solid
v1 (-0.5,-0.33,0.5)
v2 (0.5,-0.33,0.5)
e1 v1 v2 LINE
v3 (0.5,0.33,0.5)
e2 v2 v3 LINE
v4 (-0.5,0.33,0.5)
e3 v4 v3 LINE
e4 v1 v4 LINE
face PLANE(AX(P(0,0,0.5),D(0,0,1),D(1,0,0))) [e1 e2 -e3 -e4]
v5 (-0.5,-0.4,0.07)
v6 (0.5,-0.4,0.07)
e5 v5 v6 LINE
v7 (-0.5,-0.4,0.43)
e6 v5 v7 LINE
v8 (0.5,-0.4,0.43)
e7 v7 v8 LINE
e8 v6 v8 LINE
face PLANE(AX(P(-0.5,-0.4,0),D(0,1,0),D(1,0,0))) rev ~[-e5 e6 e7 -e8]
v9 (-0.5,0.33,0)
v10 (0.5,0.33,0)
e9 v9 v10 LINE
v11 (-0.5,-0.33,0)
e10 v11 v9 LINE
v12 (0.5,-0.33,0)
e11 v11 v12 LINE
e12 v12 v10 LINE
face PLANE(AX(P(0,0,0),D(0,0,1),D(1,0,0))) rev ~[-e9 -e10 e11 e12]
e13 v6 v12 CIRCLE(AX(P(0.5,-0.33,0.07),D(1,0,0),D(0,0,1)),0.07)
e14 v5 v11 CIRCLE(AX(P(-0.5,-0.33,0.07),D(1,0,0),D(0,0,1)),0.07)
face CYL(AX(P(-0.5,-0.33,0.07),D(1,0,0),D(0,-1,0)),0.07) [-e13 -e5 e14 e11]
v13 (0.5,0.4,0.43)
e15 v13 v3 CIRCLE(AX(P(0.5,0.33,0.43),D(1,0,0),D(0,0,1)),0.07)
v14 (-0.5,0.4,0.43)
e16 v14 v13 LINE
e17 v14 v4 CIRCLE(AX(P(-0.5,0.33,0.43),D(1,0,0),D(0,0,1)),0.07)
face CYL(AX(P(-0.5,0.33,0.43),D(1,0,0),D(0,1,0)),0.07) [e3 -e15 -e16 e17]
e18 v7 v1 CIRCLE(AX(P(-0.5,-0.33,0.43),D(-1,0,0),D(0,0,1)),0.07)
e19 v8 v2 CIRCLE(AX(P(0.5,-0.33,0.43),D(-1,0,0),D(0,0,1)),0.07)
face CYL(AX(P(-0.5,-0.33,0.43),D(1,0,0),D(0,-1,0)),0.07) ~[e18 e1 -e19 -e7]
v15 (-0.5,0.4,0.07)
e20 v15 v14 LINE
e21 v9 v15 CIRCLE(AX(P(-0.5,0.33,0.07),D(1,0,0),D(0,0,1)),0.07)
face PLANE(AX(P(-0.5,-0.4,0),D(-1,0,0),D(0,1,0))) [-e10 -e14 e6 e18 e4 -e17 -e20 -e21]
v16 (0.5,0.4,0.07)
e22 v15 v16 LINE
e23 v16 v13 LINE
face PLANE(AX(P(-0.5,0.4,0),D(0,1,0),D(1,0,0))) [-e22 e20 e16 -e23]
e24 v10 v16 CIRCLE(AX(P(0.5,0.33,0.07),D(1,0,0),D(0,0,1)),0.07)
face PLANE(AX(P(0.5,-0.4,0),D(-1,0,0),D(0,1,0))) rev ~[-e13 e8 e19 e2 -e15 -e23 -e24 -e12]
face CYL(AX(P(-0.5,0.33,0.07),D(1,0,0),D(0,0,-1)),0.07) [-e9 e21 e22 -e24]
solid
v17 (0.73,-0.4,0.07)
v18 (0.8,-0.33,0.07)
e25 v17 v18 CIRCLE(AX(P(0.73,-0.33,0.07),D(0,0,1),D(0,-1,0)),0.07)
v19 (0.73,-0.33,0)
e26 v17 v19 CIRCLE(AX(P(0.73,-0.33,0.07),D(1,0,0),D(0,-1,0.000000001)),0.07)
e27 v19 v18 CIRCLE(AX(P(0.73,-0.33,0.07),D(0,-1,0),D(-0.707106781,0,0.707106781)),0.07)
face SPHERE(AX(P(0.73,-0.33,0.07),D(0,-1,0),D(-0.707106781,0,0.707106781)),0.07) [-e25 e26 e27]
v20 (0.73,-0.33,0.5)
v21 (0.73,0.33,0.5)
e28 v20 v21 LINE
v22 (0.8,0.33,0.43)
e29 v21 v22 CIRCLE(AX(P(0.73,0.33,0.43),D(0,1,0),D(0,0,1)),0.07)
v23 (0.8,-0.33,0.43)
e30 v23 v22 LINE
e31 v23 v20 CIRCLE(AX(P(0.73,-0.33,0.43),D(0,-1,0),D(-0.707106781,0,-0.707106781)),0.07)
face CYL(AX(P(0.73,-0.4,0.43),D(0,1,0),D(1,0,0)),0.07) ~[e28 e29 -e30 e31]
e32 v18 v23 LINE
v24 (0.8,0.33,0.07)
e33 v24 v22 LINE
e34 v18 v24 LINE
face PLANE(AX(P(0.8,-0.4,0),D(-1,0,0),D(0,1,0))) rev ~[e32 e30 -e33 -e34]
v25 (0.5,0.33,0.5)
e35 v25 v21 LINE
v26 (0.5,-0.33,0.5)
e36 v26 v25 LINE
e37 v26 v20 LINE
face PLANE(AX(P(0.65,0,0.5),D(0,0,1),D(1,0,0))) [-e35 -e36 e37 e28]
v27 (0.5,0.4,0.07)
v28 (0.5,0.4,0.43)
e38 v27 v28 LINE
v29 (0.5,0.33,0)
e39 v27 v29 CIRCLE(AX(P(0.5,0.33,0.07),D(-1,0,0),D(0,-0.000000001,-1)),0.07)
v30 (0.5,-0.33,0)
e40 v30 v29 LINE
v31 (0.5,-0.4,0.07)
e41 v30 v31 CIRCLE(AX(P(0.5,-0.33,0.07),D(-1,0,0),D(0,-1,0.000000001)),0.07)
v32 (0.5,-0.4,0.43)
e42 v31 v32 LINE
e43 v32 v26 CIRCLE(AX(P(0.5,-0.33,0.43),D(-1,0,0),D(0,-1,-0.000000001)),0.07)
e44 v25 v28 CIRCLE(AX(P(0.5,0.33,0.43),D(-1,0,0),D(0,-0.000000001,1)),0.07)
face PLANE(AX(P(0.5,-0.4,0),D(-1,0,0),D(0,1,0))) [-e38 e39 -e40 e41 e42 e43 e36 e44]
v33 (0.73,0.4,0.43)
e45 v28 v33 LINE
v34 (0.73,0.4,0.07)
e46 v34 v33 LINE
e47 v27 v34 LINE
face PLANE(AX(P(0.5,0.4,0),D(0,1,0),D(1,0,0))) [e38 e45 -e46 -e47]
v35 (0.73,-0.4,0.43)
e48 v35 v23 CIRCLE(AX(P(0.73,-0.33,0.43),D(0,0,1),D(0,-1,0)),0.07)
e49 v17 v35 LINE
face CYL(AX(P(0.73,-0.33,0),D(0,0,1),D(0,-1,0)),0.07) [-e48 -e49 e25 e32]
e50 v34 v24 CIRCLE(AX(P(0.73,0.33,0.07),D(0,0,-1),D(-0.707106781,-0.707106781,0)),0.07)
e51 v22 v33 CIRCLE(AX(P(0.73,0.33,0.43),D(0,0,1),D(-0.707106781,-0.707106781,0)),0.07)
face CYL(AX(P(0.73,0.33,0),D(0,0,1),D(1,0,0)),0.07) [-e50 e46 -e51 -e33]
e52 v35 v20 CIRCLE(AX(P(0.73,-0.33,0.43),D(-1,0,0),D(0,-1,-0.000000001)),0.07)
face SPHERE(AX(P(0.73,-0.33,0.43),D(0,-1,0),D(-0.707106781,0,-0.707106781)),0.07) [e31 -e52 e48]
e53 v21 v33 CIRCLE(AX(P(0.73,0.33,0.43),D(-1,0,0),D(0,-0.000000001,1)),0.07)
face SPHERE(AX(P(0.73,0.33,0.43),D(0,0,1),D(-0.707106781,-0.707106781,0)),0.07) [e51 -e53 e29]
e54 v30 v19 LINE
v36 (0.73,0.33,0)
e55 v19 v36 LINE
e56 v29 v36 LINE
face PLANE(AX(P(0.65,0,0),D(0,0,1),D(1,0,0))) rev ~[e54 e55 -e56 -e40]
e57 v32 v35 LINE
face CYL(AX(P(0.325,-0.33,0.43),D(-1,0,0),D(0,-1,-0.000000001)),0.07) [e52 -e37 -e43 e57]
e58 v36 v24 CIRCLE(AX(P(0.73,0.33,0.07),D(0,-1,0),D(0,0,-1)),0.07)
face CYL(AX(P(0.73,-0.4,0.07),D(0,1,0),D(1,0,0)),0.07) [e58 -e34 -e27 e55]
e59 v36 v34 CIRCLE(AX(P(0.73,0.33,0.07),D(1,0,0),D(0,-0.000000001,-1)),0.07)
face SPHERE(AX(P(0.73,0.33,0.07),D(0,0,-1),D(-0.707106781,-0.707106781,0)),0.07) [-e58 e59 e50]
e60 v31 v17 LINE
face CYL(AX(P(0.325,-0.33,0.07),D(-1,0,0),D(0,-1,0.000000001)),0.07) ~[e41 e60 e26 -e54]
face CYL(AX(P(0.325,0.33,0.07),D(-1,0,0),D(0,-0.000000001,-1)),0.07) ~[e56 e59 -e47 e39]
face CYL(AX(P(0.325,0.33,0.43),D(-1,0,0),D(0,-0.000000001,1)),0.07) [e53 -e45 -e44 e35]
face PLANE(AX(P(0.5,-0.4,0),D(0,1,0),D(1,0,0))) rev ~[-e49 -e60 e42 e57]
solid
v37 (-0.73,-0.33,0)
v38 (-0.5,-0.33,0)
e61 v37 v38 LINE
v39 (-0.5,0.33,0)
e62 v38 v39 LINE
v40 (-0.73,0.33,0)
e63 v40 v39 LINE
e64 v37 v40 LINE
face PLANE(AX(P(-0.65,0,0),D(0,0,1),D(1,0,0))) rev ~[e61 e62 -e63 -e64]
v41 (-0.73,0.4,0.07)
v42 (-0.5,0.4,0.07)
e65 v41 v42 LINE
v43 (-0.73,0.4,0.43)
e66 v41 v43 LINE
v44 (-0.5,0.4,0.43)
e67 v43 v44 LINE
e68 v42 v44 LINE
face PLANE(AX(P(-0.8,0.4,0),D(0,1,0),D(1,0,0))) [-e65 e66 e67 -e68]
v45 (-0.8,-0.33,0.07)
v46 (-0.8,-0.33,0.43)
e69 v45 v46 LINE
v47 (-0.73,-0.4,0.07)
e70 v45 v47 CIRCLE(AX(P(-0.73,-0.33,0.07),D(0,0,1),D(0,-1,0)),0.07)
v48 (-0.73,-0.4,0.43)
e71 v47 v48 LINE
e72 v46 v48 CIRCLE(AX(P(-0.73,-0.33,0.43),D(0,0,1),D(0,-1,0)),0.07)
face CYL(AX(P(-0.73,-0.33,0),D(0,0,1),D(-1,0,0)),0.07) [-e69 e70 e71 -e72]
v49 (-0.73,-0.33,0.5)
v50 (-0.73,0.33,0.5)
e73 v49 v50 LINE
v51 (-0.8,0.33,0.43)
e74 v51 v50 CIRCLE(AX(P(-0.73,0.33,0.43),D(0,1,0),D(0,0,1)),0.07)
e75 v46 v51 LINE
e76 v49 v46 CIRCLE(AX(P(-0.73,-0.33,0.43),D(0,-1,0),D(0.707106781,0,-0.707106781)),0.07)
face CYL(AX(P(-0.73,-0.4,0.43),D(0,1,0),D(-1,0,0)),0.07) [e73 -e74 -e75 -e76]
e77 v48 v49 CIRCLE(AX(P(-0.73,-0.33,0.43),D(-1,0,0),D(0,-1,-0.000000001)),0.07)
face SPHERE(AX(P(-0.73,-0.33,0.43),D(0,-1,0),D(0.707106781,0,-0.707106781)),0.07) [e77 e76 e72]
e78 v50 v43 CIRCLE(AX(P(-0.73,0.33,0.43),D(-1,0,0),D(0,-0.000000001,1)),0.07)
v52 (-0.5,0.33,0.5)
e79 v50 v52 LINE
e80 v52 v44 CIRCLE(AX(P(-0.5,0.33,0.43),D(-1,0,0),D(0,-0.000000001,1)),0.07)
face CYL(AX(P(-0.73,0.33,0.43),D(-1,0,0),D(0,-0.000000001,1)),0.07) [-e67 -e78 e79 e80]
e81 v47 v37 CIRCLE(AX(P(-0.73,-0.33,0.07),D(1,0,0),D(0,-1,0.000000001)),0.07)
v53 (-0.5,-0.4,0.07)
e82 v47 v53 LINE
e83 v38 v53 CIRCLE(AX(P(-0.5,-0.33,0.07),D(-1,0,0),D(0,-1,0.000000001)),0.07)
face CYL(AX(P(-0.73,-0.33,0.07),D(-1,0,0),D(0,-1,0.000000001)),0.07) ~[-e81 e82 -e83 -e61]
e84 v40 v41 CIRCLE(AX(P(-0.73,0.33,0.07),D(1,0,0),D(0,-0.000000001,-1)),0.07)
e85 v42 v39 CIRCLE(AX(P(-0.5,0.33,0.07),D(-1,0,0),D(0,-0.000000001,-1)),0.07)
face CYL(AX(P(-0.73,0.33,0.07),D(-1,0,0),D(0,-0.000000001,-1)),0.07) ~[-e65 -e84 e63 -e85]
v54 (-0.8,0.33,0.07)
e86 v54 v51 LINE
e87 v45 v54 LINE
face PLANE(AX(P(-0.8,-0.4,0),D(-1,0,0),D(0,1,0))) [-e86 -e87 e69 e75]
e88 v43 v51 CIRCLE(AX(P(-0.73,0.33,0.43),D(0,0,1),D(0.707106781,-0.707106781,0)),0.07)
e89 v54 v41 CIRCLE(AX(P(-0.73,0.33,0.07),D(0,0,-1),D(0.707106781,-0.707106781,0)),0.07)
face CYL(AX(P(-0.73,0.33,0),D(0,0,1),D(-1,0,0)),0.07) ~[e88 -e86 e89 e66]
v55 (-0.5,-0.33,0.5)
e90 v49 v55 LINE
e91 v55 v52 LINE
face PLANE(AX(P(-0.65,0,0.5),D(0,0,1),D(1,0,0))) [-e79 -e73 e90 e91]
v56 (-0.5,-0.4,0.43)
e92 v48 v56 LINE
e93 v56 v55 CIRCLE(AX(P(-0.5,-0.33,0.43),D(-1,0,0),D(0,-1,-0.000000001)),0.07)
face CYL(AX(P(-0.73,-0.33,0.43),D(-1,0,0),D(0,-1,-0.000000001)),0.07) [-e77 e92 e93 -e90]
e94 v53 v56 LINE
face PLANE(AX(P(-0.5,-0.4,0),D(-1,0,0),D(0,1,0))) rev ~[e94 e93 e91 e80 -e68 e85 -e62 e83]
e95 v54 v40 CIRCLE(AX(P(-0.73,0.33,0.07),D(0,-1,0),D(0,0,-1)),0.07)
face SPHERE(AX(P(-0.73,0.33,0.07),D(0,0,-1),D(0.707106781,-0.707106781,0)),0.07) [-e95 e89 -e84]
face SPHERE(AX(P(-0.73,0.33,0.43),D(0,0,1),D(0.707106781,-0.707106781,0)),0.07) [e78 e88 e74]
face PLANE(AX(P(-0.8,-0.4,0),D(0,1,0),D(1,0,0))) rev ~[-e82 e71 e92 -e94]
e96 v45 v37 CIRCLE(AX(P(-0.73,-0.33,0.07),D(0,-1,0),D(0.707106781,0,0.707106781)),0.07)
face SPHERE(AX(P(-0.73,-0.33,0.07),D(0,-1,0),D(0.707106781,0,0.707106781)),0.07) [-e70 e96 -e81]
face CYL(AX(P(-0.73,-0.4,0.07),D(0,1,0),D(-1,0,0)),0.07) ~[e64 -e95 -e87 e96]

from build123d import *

# Parameters (mm, degrees)
F0_W           = 0.3
F0_H           = 0.8
F1_DEPTH       = 0.5
F0_W_2         = 1
F2_DEPTH       = 0.5
F3_R           = 0.07
F3_2_R         = 0.07
F4_T1_DEPTH    = 0.405
F4_S5_W        = 0.07
F4_S5_H        = 0.07
F4_T6_DEPTH    = 0.07
F4_S11_W       = 0.07
F4_S11_H       = 0.07
F4_T12_DEPTH   = 0.07
F4_S17_W       = 0.07
F4_S17_H       = 0.07
F4_T18_DEPTH   = 0.07
F4_S23_W       = 0.07
F4_S23_H       = 0.07
F4_T24_DEPTH   = 0.07
F4_2_F1_R      = 0.07
F4_2_F2_R      = 0.07
F4_2_F3_R      = 0.07
F4_2_F4_R      = 0.07
F4_3_T1_DEPTH  = 0.405
F4_3_S5_W      = 0.07
F4_3_S5_H      = 0.07
F4_3_T6_DEPTH  = 0.07
F4_3_S11_W     = 0.07
F4_3_S11_H     = 0.07
F4_3_T12_DEPTH = 0.07
F4_3_S17_W     = 0.07
F4_3_S17_H     = 0.07
F4_3_T18_DEPTH = 0.07
F4_3_S23_W     = 0.07
F4_3_S23_H     = 0.07
F4_3_T24_DEPTH = 0.07


# Not quite as in the source:
# - a fillet or chamfer that OpenCascade refuses, or shapes differently, is made with other operations: its cross-section is extruded or revolved along the edge and cut away or added


with BuildPart() as f1:
    # F0 (on Top) → F1 (new body)
    with BuildSketch(Plane.XY):
        with Locations((-0.65, 0)):
            Rectangle(F0_W, F0_H)
    extrude(amount=F1_DEPTH)

    # F3#2
    f3_2_edges = [f1.edges().sort_by_distance(p)[0] for p in [
        (-0.8, 0.4, 0.25),
        (-0.8, -0.4, 0.25),
        (-0.8, 0, 0),
        (-0.8, 0, 0.5),
    ]]
    fillet(f3_2_edges, radius=F3_2_R)

    # F4#3: fillet of radius 0.07 on 4 edges, made by hand

    # F4_3_s2 → F4_3_t1 (cut)
    with BuildSketch(Plane.YZ.offset(-0.73)):
        with BuildLine():
            ThreePointArc((0.33, 0.5), (0.3794974747, 0.4794974747), (0.4, 0.43))
            Line((0.4, 0.43), (0.4, 0.5))
            Line((0.4, 0.5), (0.33, 0.5))
        make_face()
        with BuildLine():
            ThreePointArc((0.33, 0), (0.3794974747, 0.0205025253), (0.4, 0.07))
            Line((0.4, 0.07), (0.4, 0))
            Line((0.4, 0), (0.33, 0))
        make_face()
        with BuildLine():
            ThreePointArc((-0.4, 0.43), (-0.3794974747, 0.4794974747), (-0.33, 0.5))
            Line((-0.33, 0.5), (-0.4, 0.5))
            Line((-0.4, 0.5), (-0.4, 0.43))
        make_face()
        with BuildLine():
            ThreePointArc((-0.4, 0.07), (-0.3794974747, 0.0205025253), (-0.33, 0))
            Line((-0.33, 0), (-0.4, 0))
            Line((-0.4, 0), (-0.4, 0.07))
        make_face()
    extrude(amount=F4_3_T1_DEPTH, mode=Mode.SUBTRACT)


with BuildPart() as f1b:
    # F0 (on Top) → F1, piece 2 (new body)
    with BuildSketch(Plane.XY):
        with Locations((0.65, 0)):
            Rectangle(F0_W, F0_H)
    extrude(amount=F1_DEPTH)

    # F3
    f3_edges = [f1b.edges().sort_by_distance(p)[0] for p in [
        (0.8, -0.4, 0.25),
        (0.8, 0.4, 0.25),
        (0.8, 0, 0),
        (0.8, 0, 0.5),
    ]]
    fillet(f3_edges, radius=F3_R)

    # F4: fillet of radius 0.07 on 4 edges, made by hand

    # F4_s2 → F4_t1 (cut)
    with BuildSketch(Plane.YZ.offset(0.325)):
        with BuildLine():
            ThreePointArc((0.33, 0.5), (0.3794974747, 0.4794974747), (0.4, 0.43))
            Line((0.4, 0.43), (0.4, 0.5))
            Line((0.4, 0.5), (0.33, 0.5))
        make_face()
        with BuildLine():
            ThreePointArc((0.33, 0), (0.3794974747, 0.0205025253), (0.4, 0.07))
            Line((0.4, 0.07), (0.4, 0))
            Line((0.4, 0), (0.33, 0))
        make_face()
        with BuildLine():
            ThreePointArc((-0.4, 0.43), (-0.3794974747, 0.4794974747), (-0.33, 0.5))
            Line((-0.33, 0.5), (-0.4, 0.5))
            Line((-0.4, 0.5), (-0.4, 0.43))
        make_face()
        with BuildLine():
            ThreePointArc((-0.4, 0.07), (-0.3794974747, 0.0205025253), (-0.33, 0))
            Line((-0.33, 0), (-0.4, 0))
            Line((-0.4, 0), (-0.4, 0.07))
        make_face()
    extrude(amount=F4_T1_DEPTH, mode=Mode.SUBTRACT)


with BuildPart() as f2:
    # F0 (on Top) → F2 (new body)
    with BuildSketch(Plane.XY):
        Rectangle(F0_W_2, F0_H)
    extrude(amount=F2_DEPTH)

    # F4#2: fillet of radius 0.07 on 4 edges, made by hand

    # F4_2_f1
    f4_2_f1_edges = [f2.edges().sort_by_distance(p)[0] for p in [
        (0, -0.4, 0),
    ]]
    fillet(f4_2_f1_edges, radius=F4_2_F1_R)

    # F4_2_f2
    f4_2_f2_edges = [f2.edges().sort_by_distance(p)[0] for p in [
        (0, -0.4, 0.5),
    ]]
    fillet(f4_2_f2_edges, radius=F4_2_F2_R)

    # F4_2_f3
    f4_2_f3_edges = [f2.edges().sort_by_distance(p)[0] for p in [
        (0, 0.4, 0),
    ]]
    fillet(f4_2_f3_edges, radius=F4_2_F3_R)

    # F4_2_f4
    f4_2_f4_edges = [f2.edges().sort_by_distance(p)[0] for p in [
        (0, 0.4, 0.5),
    ]]
    fillet(f4_2_f4_edges, radius=F4_2_F4_R)


with BuildPart() as f4_tool4:
    # F4_s5 → F4_t6 (new body)
    with BuildSketch(Plane.XZ.offset(0.33)):
        with Locations((0.765, 0.035)):
            Rectangle(F4_S5_W, F4_S5_H)
    extrude(amount=F4_T6_DEPTH)

    # F4_s7 → F4_t8 (revolve, cut)
    with BuildSketch(Plane(origin=(0.73, -0.33, 0.07), x_dir=(-0.7071067812, 0, 0.7071067812), z_dir=(0.7071067812, 0, 0.7071067812))):
        with BuildLine():
            ThreePointArc((0, -0.07), (0.07, 0), (0, 0.07))
            Line((0, 0.07), (0, -0.07))
        make_face()
    revolve(axis=Axis((0.73, -0.33, 0.07), (0, -1, 0)), mode=Mode.SUBTRACT)


with BuildPart() as f1b_1:
    add(f1b.part)

    # F4_t3: cut F4_tool4
    add(f4_tool4.part, mode=Mode.SUBTRACT)


with BuildPart() as f4_tool10:
    # F4_s11 → F4_t12 (new body)
    with BuildSketch(Plane.XZ.offset(0.33)):
        with Locations((0.765, 0.465)):
            Rectangle(F4_S11_W, F4_S11_H)
    extrude(amount=F4_T12_DEPTH)

    # F4_s13 → F4_t14 (revolve, cut)
    with BuildSketch(Plane(origin=(0.73, -0.33, 0.43), x_dir=(-0.7071067812, 0, -0.7071067812), z_dir=(-0.7071067812, 0, 0.7071067812))):
        with BuildLine():
            ThreePointArc((0, -0.07), (0.07, 0), (0, 0.07))
            Line((0, 0.07), (0, -0.07))
        make_face()
    revolve(axis=Axis((0.73, -0.33, 0.43), (0, -1, 0)), mode=Mode.SUBTRACT)


with BuildPart() as f1b_2:
    add(f1b_1.part)

    # F4_t9: cut F4_tool10
    add(f4_tool10.part, mode=Mode.SUBTRACT)


with BuildPart() as f4_tool16:
    # F4_s17 → F4_t18 (new body)
    with BuildSketch(Plane.XY.offset(0.07)):
        with Locations((0.765, 0.365)):
            Rectangle(F4_S17_W, F4_S17_H)
    extrude(amount=-F4_T18_DEPTH)

    # F4_s19 → F4_t20 (revolve, cut)
    with BuildSketch(Plane(origin=(0.73, 0.33, 0.07), x_dir=(-0.7071067812, -0.7071067812, 0), z_dir=(0.7071067812, -0.7071067812, 0))):
        with BuildLine():
            ThreePointArc((0, -0.07), (0.07, 0), (0, 0.07))
            Line((0, 0.07), (0, -0.07))
        make_face()
    revolve(axis=Axis((0.73, 0.33, 0.07), (0, 0, -1)), mode=Mode.SUBTRACT)


with BuildPart() as f1b_3:
    add(f1b_2.part)

    # F4_t15: cut F4_tool16
    add(f4_tool16.part, mode=Mode.SUBTRACT)


with BuildPart() as f4_tool22:
    # F4_s23 → F4_t24 (new body)
    with BuildSketch(Plane.XY.offset(0.43)):
        with Locations((0.765, 0.365)):
            Rectangle(F4_S23_W, F4_S23_H)
    extrude(amount=F4_T24_DEPTH)

    # F4_s25 → F4_t26 (revolve, cut)
    with BuildSketch(Plane(origin=(0.73, 0.33, 0.43), x_dir=(-0.7071067812, -0.7071067812, 0), z_dir=(-0.7071067812, 0.7071067812, 0))):
        with BuildLine():
            ThreePointArc((0, -0.07), (0.07, 0), (0, 0.07))
            Line((0, 0.07), (0, -0.07))
        make_face()
    revolve(axis=Axis((0.73, 0.33, 0.43), (0, 0, 1)), mode=Mode.SUBTRACT)


with BuildPart() as f1b_4:
    add(f1b_3.part)

    # F4_t21: cut F4_tool22
    add(f4_tool22.part, mode=Mode.SUBTRACT)


with BuildPart() as f4_3_tool4:
    # F4_3_s5 → F4_3_t6 (new body)
    with BuildSketch(Plane.XZ.offset(0.33)):
        with Locations((-0.765, 0.035)):
            Rectangle(F4_3_S5_W, F4_3_S5_H)
    extrude(amount=F4_3_T6_DEPTH)

    # F4_3_s7 → F4_3_t8 (revolve, cut)
    with BuildSketch(Plane(origin=(-0.73, -0.33, 0.07), x_dir=(0.7071067812, 0, 0.7071067812), z_dir=(0.7071067812, 0, -0.7071067812))):
        with BuildLine():
            ThreePointArc((0, -0.07), (0.07, 0), (0, 0.07))
            Line((0, 0.07), (0, -0.07))
        make_face()
    revolve(axis=Axis((-0.73, -0.33, 0.07), (0, -1, 0)), mode=Mode.SUBTRACT)


with BuildPart() as f1_1:
    add(f1.part)

    # F4_3_t3: cut F4_3_tool4
    add(f4_3_tool4.part, mode=Mode.SUBTRACT)


with BuildPart() as f4_3_tool10:
    # F4_3_s11 → F4_3_t12 (new body)
    with BuildSketch(Plane.XZ.offset(0.33)):
        with Locations((-0.765, 0.465)):
            Rectangle(F4_3_S11_W, F4_3_S11_H)
    extrude(amount=F4_3_T12_DEPTH)

    # F4_3_s13 → F4_3_t14 (revolve, cut)
    with BuildSketch(Plane(origin=(-0.73, -0.33, 0.43), x_dir=(0.7071067812, 0, -0.7071067812), z_dir=(-0.7071067812, 0, -0.7071067812))):
        with BuildLine():
            ThreePointArc((0, -0.07), (0.07, 0), (0, 0.07))
            Line((0, 0.07), (0, -0.07))
        make_face()
    revolve(axis=Axis((-0.73, -0.33, 0.43), (0, -1, 0)), mode=Mode.SUBTRACT)


with BuildPart() as f1_2:
    add(f1_1.part)

    # F4_3_t9: cut F4_3_tool10
    add(f4_3_tool10.part, mode=Mode.SUBTRACT)


with BuildPart() as f4_3_tool16:
    # F4_3_s17 → F4_3_t18 (new body)
    with BuildSketch(Plane.XY.offset(0.07)):
        with Locations((-0.765, 0.365)):
            Rectangle(F4_3_S17_W, F4_3_S17_H)
    extrude(amount=-F4_3_T18_DEPTH)

    # F4_3_s19 → F4_3_t20 (revolve, cut)
    with BuildSketch(Plane(origin=(-0.73, 0.33, 0.07), x_dir=(0.7071067812, -0.7071067812, 0), z_dir=(0.7071067812, 0.7071067812, 0))):
        with BuildLine():
            ThreePointArc((0, -0.07), (0.07, 0), (0, 0.07))
            Line((0, 0.07), (0, -0.07))
        make_face()
    revolve(axis=Axis((-0.73, 0.33, 0.07), (0, 0, -1)), mode=Mode.SUBTRACT)


with BuildPart() as f1_3:
    add(f1_2.part)

    # F4_3_t15: cut F4_3_tool16
    add(f4_3_tool16.part, mode=Mode.SUBTRACT)


with BuildPart() as f4_3_tool22:
    # F4_3_s23 → F4_3_t24 (new body)
    with BuildSketch(Plane.XY.offset(0.43)):
        with Locations((-0.765, 0.365)):
            Rectangle(F4_3_S23_W, F4_3_S23_H)
    extrude(amount=F4_3_T24_DEPTH)

    # F4_3_s25 → F4_3_t26 (revolve, cut)
    with BuildSketch(Plane(origin=(-0.73, 0.33, 0.43), x_dir=(0.7071067812, -0.7071067812, 0), z_dir=(-0.7071067812, -0.7071067812, 0))):
        with BuildLine():
            ThreePointArc((0, -0.07), (0.07, 0), (0, 0.07))
            Line((0, 0.07), (0, -0.07))
        make_face()
    revolve(axis=Axis((-0.73, 0.33, 0.43), (0, 0, 1)), mode=Mode.SUBTRACT)


with BuildPart() as f1_4:
    add(f1_3.part)

    # F4_3_t21: cut F4_3_tool22
    add(f4_3_tool22.part, mode=Mode.SUBTRACT)


solid = Compound([f2.part, f1b_4.part, f1_4.part])
